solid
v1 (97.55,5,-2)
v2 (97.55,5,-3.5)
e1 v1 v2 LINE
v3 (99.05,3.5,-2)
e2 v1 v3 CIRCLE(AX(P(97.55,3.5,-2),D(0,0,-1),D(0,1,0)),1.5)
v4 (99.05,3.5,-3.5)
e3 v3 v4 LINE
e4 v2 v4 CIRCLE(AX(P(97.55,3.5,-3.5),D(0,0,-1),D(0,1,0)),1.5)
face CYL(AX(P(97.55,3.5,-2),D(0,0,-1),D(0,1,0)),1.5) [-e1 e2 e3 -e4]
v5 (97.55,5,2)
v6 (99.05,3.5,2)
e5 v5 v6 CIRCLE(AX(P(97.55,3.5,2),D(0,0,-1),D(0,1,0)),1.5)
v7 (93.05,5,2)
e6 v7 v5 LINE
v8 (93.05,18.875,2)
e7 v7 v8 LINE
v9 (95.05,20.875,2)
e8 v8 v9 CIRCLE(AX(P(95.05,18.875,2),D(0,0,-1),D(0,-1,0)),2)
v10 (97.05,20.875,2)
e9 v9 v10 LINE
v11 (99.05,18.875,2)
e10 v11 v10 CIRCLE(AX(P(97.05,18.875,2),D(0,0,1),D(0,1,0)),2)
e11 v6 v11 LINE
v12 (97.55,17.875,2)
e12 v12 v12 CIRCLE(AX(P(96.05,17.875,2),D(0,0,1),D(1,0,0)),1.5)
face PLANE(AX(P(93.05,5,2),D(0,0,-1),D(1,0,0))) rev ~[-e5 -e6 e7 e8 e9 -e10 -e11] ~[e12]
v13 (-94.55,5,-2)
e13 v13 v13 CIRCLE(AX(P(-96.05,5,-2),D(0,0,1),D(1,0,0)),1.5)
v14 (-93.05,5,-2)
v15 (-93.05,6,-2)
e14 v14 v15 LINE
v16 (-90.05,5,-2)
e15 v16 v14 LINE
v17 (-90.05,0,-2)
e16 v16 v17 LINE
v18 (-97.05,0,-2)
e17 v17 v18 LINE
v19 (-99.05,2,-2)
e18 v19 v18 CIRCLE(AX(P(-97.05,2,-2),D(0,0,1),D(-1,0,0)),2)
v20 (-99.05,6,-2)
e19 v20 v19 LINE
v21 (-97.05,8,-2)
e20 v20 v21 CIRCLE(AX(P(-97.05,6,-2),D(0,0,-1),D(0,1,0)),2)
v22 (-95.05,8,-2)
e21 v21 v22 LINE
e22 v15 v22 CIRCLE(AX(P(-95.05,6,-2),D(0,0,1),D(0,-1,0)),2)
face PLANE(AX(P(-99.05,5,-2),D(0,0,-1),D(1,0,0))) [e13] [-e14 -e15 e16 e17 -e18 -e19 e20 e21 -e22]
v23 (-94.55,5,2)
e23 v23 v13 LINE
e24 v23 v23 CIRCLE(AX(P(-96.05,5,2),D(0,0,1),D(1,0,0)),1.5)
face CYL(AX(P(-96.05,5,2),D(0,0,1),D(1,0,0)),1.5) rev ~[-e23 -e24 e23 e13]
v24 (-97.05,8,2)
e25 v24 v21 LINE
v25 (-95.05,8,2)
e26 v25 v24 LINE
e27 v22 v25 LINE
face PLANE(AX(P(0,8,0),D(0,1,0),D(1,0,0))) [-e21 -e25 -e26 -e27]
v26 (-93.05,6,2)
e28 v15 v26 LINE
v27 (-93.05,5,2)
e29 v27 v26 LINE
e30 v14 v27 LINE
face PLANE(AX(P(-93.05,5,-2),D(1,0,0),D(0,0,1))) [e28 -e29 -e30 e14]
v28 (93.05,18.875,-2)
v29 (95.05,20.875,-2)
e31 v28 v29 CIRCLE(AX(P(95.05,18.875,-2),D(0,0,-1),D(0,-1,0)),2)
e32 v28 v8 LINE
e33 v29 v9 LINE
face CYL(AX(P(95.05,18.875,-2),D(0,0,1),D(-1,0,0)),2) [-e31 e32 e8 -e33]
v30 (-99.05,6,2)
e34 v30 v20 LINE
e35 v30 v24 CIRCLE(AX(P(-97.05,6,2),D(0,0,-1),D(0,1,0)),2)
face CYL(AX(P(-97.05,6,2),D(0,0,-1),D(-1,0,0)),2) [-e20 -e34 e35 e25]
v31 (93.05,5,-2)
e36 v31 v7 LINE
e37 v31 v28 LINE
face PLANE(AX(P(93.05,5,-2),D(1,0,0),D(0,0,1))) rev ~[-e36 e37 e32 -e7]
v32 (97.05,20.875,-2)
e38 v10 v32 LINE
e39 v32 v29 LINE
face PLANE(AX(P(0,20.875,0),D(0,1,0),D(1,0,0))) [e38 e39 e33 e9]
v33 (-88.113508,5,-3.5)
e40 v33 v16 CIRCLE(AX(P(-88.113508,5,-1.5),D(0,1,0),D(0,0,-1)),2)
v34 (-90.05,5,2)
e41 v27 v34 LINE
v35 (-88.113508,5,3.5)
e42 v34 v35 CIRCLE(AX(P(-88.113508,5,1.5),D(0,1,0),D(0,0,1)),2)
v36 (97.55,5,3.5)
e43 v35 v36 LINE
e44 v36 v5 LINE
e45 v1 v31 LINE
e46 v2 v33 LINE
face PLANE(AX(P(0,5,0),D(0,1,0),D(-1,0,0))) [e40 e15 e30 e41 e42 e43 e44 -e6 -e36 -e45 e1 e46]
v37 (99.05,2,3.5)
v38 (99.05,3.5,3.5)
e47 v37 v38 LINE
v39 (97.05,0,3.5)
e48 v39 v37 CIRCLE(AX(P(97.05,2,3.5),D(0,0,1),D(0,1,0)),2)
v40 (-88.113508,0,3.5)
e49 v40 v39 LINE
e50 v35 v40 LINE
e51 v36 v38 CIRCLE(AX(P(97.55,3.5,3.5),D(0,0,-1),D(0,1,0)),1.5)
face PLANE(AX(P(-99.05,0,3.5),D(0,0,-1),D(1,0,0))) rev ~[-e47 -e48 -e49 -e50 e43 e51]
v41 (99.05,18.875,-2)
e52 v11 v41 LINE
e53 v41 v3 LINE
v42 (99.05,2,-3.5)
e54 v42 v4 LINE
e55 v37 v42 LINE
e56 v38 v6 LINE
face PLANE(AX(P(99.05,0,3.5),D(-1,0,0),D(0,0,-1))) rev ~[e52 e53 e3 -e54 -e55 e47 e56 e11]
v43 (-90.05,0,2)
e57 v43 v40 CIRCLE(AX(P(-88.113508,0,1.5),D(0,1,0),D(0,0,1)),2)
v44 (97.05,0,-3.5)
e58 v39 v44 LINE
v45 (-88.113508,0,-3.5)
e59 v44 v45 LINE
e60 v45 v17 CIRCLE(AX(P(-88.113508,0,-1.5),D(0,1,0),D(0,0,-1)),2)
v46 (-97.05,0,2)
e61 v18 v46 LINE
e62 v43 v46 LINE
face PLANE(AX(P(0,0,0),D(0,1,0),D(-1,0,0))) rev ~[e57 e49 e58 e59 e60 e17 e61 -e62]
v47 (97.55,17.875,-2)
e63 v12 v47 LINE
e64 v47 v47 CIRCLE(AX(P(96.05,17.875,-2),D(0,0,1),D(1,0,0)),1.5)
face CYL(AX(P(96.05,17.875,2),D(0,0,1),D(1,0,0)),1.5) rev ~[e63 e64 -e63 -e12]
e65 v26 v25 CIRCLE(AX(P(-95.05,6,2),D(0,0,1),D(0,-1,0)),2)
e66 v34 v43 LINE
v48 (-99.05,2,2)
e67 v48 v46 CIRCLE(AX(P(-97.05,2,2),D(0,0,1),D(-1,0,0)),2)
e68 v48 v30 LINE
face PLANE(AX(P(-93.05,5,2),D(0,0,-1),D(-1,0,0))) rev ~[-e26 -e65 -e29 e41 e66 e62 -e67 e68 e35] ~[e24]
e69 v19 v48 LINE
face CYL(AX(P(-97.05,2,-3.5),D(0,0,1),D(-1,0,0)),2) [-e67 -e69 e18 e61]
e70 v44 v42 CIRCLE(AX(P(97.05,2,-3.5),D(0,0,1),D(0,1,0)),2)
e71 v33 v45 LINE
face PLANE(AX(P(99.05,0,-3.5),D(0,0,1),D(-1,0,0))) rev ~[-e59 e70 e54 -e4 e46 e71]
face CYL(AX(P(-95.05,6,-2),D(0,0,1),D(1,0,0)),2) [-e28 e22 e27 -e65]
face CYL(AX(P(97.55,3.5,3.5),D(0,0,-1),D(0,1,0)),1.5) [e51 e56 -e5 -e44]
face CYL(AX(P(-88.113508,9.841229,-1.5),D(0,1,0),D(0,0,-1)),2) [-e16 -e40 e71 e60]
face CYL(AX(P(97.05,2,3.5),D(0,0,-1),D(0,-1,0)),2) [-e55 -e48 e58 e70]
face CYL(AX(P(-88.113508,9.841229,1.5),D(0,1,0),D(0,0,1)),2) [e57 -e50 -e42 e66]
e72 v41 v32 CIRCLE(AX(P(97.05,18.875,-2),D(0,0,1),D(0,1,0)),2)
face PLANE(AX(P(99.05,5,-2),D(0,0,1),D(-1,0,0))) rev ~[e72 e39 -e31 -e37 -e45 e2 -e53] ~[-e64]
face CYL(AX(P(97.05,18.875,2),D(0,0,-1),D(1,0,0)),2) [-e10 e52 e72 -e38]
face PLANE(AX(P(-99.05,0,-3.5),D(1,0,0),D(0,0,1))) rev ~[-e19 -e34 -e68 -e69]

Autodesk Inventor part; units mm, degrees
ref_plane "YZ Plane" through (0, 0, 0) normal (1, 0, 0) x (0, 1, 0)
ref_plane "XZ Plane" through (0, 0, 0) normal (0, 1, 0) x (-1, 0, 0)
ref_plane "XY Plane" through (0, 0, 0) normal (0, 0, 1) x (1, 0, 0)
sketch "Sketch1" plane through (0, 0, 0) normal (0, 1, 0) x (-1, 0, 0)
  line L0 (99.05, 3.5) -> (-99.05, 3.5)
  line L1 (-99.05, 3.5) -> (-99.05, -3.5)
  line L2 (-99.05, -3.5) -> (99.05, -3.5)
  line L3 (99.05, -3.5) -> (99.05, 3.5)
  line L4 (99.05, 3.5) -> (-99.05, -3.5) construction
  line L5 (-99.05, 3.5) -> (99.05, -3.5) construction
  point P0 (0, 0)
  dimension "d0" = 198.1
  dimension "d1" = 7
extrude "Extrusion1" add sketch "Sketch1" along normal blind 5
sketch "Sketch2" plane through (0, 5, 0) normal (0, 1, 0) x (1, 0, 0)
  line L0 (99.05, -3.5) -> (99.05, 3.5) projected
  line L1 (99.05, 2) -> (93.05, 2)
  line L2 (93.05, 2) -> (93.05, -2)
  line L3 (93.05, -2) -> (99.05, -2)
  line L4 (99.05, -2) -> (99.05, 2)
  line L5 (99.05, 3.5) -> (-99.05, 3.5) projected
  point P0 (0, 0)
  dimension "d25" = 6
  dimension "d26" = 4
  dimension "d27" = 1.5
extrude "Extrusion2" add sketch "Sketch2" along normal blind 15.875
fillet "Fillet1" radius 2 2 edges at (99.05, 20.875, 0) (93.05, 20.875, 0)
sketch "Sketch4" plane through (0, 5, 0) normal (0, 1, 0) x (1, 0, 0)
  line L0 (99.05, 3.5) -> (-99.05, 3.5) projected
  line L1 (-99.05, 2) -> (-93.05, 2)
  line L2 (-93.05, 2) -> (-93.05, -2)
  line L3 (-93.05, -2) -> (-99.05, -2)
  line L4 (-99.05, -2) -> (-99.05, 2)
  line L5 (-99.05, 3.5) -> (-99.05, -3.5) projected
  point P0 (0, 0)
  dimension "d33" = 6
  dimension "d34" = 4
  dimension "d35" = 6
  dimension "d36" = 1.5
extrude "Extrusion4" add sketch "Sketch4" along normal blind 3
fillet "Fillet2" radius 2 2 edges at (-93.05, 8, 0) (-99.05, 8, 0)
fillet "Fillet3" radius 2 2 edges at (99.05, 0, 0) (-99.05, 0, 0)
sketch "Sketch6" plane through (93.05, 5, 2) normal (0, 0, 1) x (1, 0, 0)
  line L0 (0, 15.875) -> (6, 15.875) construction
  line L1 (3, 15.875) -> (3, 12.875) construction
  line L2 (3, 15.875) -> (6, 15.875) construction
  circle A0 centre (3, 12.875) radius 1.5
  point P0 (-93.05, -5)
  dimension "d28" = 3
  dimension "d29" = 90
  dimension "d30" = 3
extrude "Extrusion6" cut sketch "Sketch6" against normal through all
sketch "Sketch7" plane through (-99.05, 5, 2) normal (0, 0, 1) x (1, 0, 0)
  line L0 (4, 3) -> (2, 3) construction
  line L1 (3, 3) -> (3, 0) construction
  line L2 (3, 3) -> (6, 3) construction
  circle A0 centre (3, 0) radius 1.5
  point P0 (99.05, -5)
  dimension "d57" = 1.5
  dimension "d37" = 3
  dimension "d38" = 90
  dimension "d39" = 3
sketch "Sketch8" plane through (0, 5, 0) normal (0, 1, 0) x (1, 0, 0)
  line L0 (-99.05, -3.5) -> (99.05, -3.5) projected
  line L1 (-93.05, -2) -> (-99.05, -2) projected
  line L2 (-99.05, -2) -> (-90.05, -2)
  line L3 (-90.05, -2) -> (-90.05, -3.5)
  line L4 (-90.05, -3.5) -> (-99.05, -3.5)
  line L5 (-99.05, -3.5) -> (-99.05, -2)
  line L6 (-99.05, 3.5) -> (-90.05, 3.5)
  line L7 (-90.05, 3.5) -> (-90.05, 2)
  line L8 (-90.05, 2) -> (-99.05, 2)
  line L9 (-99.05, 2) -> (-99.05, 3.5)
  point P0 (0, 0)
  dimension "d54" = 9
  dimension "d55" = 1.5
  dimension "d56" = 9
  dimension "d57" = 1.5
extrude "Extrusion7" cut sketch "Sketch8" against normal through all
extrude "Extrusion8" cut sketch "Sketch7" against normal through all
fillet "Fillet5" radius 1.5 2 edges at (99.05, 5, 2.75) (99.05, 5, -2.75)
fillet "Fillet6" radius 2 2 edges at (-90.05, 2.5, 3.5) (-90.05, 2.5, -3.5)
properties part number "Brace_unequal"
